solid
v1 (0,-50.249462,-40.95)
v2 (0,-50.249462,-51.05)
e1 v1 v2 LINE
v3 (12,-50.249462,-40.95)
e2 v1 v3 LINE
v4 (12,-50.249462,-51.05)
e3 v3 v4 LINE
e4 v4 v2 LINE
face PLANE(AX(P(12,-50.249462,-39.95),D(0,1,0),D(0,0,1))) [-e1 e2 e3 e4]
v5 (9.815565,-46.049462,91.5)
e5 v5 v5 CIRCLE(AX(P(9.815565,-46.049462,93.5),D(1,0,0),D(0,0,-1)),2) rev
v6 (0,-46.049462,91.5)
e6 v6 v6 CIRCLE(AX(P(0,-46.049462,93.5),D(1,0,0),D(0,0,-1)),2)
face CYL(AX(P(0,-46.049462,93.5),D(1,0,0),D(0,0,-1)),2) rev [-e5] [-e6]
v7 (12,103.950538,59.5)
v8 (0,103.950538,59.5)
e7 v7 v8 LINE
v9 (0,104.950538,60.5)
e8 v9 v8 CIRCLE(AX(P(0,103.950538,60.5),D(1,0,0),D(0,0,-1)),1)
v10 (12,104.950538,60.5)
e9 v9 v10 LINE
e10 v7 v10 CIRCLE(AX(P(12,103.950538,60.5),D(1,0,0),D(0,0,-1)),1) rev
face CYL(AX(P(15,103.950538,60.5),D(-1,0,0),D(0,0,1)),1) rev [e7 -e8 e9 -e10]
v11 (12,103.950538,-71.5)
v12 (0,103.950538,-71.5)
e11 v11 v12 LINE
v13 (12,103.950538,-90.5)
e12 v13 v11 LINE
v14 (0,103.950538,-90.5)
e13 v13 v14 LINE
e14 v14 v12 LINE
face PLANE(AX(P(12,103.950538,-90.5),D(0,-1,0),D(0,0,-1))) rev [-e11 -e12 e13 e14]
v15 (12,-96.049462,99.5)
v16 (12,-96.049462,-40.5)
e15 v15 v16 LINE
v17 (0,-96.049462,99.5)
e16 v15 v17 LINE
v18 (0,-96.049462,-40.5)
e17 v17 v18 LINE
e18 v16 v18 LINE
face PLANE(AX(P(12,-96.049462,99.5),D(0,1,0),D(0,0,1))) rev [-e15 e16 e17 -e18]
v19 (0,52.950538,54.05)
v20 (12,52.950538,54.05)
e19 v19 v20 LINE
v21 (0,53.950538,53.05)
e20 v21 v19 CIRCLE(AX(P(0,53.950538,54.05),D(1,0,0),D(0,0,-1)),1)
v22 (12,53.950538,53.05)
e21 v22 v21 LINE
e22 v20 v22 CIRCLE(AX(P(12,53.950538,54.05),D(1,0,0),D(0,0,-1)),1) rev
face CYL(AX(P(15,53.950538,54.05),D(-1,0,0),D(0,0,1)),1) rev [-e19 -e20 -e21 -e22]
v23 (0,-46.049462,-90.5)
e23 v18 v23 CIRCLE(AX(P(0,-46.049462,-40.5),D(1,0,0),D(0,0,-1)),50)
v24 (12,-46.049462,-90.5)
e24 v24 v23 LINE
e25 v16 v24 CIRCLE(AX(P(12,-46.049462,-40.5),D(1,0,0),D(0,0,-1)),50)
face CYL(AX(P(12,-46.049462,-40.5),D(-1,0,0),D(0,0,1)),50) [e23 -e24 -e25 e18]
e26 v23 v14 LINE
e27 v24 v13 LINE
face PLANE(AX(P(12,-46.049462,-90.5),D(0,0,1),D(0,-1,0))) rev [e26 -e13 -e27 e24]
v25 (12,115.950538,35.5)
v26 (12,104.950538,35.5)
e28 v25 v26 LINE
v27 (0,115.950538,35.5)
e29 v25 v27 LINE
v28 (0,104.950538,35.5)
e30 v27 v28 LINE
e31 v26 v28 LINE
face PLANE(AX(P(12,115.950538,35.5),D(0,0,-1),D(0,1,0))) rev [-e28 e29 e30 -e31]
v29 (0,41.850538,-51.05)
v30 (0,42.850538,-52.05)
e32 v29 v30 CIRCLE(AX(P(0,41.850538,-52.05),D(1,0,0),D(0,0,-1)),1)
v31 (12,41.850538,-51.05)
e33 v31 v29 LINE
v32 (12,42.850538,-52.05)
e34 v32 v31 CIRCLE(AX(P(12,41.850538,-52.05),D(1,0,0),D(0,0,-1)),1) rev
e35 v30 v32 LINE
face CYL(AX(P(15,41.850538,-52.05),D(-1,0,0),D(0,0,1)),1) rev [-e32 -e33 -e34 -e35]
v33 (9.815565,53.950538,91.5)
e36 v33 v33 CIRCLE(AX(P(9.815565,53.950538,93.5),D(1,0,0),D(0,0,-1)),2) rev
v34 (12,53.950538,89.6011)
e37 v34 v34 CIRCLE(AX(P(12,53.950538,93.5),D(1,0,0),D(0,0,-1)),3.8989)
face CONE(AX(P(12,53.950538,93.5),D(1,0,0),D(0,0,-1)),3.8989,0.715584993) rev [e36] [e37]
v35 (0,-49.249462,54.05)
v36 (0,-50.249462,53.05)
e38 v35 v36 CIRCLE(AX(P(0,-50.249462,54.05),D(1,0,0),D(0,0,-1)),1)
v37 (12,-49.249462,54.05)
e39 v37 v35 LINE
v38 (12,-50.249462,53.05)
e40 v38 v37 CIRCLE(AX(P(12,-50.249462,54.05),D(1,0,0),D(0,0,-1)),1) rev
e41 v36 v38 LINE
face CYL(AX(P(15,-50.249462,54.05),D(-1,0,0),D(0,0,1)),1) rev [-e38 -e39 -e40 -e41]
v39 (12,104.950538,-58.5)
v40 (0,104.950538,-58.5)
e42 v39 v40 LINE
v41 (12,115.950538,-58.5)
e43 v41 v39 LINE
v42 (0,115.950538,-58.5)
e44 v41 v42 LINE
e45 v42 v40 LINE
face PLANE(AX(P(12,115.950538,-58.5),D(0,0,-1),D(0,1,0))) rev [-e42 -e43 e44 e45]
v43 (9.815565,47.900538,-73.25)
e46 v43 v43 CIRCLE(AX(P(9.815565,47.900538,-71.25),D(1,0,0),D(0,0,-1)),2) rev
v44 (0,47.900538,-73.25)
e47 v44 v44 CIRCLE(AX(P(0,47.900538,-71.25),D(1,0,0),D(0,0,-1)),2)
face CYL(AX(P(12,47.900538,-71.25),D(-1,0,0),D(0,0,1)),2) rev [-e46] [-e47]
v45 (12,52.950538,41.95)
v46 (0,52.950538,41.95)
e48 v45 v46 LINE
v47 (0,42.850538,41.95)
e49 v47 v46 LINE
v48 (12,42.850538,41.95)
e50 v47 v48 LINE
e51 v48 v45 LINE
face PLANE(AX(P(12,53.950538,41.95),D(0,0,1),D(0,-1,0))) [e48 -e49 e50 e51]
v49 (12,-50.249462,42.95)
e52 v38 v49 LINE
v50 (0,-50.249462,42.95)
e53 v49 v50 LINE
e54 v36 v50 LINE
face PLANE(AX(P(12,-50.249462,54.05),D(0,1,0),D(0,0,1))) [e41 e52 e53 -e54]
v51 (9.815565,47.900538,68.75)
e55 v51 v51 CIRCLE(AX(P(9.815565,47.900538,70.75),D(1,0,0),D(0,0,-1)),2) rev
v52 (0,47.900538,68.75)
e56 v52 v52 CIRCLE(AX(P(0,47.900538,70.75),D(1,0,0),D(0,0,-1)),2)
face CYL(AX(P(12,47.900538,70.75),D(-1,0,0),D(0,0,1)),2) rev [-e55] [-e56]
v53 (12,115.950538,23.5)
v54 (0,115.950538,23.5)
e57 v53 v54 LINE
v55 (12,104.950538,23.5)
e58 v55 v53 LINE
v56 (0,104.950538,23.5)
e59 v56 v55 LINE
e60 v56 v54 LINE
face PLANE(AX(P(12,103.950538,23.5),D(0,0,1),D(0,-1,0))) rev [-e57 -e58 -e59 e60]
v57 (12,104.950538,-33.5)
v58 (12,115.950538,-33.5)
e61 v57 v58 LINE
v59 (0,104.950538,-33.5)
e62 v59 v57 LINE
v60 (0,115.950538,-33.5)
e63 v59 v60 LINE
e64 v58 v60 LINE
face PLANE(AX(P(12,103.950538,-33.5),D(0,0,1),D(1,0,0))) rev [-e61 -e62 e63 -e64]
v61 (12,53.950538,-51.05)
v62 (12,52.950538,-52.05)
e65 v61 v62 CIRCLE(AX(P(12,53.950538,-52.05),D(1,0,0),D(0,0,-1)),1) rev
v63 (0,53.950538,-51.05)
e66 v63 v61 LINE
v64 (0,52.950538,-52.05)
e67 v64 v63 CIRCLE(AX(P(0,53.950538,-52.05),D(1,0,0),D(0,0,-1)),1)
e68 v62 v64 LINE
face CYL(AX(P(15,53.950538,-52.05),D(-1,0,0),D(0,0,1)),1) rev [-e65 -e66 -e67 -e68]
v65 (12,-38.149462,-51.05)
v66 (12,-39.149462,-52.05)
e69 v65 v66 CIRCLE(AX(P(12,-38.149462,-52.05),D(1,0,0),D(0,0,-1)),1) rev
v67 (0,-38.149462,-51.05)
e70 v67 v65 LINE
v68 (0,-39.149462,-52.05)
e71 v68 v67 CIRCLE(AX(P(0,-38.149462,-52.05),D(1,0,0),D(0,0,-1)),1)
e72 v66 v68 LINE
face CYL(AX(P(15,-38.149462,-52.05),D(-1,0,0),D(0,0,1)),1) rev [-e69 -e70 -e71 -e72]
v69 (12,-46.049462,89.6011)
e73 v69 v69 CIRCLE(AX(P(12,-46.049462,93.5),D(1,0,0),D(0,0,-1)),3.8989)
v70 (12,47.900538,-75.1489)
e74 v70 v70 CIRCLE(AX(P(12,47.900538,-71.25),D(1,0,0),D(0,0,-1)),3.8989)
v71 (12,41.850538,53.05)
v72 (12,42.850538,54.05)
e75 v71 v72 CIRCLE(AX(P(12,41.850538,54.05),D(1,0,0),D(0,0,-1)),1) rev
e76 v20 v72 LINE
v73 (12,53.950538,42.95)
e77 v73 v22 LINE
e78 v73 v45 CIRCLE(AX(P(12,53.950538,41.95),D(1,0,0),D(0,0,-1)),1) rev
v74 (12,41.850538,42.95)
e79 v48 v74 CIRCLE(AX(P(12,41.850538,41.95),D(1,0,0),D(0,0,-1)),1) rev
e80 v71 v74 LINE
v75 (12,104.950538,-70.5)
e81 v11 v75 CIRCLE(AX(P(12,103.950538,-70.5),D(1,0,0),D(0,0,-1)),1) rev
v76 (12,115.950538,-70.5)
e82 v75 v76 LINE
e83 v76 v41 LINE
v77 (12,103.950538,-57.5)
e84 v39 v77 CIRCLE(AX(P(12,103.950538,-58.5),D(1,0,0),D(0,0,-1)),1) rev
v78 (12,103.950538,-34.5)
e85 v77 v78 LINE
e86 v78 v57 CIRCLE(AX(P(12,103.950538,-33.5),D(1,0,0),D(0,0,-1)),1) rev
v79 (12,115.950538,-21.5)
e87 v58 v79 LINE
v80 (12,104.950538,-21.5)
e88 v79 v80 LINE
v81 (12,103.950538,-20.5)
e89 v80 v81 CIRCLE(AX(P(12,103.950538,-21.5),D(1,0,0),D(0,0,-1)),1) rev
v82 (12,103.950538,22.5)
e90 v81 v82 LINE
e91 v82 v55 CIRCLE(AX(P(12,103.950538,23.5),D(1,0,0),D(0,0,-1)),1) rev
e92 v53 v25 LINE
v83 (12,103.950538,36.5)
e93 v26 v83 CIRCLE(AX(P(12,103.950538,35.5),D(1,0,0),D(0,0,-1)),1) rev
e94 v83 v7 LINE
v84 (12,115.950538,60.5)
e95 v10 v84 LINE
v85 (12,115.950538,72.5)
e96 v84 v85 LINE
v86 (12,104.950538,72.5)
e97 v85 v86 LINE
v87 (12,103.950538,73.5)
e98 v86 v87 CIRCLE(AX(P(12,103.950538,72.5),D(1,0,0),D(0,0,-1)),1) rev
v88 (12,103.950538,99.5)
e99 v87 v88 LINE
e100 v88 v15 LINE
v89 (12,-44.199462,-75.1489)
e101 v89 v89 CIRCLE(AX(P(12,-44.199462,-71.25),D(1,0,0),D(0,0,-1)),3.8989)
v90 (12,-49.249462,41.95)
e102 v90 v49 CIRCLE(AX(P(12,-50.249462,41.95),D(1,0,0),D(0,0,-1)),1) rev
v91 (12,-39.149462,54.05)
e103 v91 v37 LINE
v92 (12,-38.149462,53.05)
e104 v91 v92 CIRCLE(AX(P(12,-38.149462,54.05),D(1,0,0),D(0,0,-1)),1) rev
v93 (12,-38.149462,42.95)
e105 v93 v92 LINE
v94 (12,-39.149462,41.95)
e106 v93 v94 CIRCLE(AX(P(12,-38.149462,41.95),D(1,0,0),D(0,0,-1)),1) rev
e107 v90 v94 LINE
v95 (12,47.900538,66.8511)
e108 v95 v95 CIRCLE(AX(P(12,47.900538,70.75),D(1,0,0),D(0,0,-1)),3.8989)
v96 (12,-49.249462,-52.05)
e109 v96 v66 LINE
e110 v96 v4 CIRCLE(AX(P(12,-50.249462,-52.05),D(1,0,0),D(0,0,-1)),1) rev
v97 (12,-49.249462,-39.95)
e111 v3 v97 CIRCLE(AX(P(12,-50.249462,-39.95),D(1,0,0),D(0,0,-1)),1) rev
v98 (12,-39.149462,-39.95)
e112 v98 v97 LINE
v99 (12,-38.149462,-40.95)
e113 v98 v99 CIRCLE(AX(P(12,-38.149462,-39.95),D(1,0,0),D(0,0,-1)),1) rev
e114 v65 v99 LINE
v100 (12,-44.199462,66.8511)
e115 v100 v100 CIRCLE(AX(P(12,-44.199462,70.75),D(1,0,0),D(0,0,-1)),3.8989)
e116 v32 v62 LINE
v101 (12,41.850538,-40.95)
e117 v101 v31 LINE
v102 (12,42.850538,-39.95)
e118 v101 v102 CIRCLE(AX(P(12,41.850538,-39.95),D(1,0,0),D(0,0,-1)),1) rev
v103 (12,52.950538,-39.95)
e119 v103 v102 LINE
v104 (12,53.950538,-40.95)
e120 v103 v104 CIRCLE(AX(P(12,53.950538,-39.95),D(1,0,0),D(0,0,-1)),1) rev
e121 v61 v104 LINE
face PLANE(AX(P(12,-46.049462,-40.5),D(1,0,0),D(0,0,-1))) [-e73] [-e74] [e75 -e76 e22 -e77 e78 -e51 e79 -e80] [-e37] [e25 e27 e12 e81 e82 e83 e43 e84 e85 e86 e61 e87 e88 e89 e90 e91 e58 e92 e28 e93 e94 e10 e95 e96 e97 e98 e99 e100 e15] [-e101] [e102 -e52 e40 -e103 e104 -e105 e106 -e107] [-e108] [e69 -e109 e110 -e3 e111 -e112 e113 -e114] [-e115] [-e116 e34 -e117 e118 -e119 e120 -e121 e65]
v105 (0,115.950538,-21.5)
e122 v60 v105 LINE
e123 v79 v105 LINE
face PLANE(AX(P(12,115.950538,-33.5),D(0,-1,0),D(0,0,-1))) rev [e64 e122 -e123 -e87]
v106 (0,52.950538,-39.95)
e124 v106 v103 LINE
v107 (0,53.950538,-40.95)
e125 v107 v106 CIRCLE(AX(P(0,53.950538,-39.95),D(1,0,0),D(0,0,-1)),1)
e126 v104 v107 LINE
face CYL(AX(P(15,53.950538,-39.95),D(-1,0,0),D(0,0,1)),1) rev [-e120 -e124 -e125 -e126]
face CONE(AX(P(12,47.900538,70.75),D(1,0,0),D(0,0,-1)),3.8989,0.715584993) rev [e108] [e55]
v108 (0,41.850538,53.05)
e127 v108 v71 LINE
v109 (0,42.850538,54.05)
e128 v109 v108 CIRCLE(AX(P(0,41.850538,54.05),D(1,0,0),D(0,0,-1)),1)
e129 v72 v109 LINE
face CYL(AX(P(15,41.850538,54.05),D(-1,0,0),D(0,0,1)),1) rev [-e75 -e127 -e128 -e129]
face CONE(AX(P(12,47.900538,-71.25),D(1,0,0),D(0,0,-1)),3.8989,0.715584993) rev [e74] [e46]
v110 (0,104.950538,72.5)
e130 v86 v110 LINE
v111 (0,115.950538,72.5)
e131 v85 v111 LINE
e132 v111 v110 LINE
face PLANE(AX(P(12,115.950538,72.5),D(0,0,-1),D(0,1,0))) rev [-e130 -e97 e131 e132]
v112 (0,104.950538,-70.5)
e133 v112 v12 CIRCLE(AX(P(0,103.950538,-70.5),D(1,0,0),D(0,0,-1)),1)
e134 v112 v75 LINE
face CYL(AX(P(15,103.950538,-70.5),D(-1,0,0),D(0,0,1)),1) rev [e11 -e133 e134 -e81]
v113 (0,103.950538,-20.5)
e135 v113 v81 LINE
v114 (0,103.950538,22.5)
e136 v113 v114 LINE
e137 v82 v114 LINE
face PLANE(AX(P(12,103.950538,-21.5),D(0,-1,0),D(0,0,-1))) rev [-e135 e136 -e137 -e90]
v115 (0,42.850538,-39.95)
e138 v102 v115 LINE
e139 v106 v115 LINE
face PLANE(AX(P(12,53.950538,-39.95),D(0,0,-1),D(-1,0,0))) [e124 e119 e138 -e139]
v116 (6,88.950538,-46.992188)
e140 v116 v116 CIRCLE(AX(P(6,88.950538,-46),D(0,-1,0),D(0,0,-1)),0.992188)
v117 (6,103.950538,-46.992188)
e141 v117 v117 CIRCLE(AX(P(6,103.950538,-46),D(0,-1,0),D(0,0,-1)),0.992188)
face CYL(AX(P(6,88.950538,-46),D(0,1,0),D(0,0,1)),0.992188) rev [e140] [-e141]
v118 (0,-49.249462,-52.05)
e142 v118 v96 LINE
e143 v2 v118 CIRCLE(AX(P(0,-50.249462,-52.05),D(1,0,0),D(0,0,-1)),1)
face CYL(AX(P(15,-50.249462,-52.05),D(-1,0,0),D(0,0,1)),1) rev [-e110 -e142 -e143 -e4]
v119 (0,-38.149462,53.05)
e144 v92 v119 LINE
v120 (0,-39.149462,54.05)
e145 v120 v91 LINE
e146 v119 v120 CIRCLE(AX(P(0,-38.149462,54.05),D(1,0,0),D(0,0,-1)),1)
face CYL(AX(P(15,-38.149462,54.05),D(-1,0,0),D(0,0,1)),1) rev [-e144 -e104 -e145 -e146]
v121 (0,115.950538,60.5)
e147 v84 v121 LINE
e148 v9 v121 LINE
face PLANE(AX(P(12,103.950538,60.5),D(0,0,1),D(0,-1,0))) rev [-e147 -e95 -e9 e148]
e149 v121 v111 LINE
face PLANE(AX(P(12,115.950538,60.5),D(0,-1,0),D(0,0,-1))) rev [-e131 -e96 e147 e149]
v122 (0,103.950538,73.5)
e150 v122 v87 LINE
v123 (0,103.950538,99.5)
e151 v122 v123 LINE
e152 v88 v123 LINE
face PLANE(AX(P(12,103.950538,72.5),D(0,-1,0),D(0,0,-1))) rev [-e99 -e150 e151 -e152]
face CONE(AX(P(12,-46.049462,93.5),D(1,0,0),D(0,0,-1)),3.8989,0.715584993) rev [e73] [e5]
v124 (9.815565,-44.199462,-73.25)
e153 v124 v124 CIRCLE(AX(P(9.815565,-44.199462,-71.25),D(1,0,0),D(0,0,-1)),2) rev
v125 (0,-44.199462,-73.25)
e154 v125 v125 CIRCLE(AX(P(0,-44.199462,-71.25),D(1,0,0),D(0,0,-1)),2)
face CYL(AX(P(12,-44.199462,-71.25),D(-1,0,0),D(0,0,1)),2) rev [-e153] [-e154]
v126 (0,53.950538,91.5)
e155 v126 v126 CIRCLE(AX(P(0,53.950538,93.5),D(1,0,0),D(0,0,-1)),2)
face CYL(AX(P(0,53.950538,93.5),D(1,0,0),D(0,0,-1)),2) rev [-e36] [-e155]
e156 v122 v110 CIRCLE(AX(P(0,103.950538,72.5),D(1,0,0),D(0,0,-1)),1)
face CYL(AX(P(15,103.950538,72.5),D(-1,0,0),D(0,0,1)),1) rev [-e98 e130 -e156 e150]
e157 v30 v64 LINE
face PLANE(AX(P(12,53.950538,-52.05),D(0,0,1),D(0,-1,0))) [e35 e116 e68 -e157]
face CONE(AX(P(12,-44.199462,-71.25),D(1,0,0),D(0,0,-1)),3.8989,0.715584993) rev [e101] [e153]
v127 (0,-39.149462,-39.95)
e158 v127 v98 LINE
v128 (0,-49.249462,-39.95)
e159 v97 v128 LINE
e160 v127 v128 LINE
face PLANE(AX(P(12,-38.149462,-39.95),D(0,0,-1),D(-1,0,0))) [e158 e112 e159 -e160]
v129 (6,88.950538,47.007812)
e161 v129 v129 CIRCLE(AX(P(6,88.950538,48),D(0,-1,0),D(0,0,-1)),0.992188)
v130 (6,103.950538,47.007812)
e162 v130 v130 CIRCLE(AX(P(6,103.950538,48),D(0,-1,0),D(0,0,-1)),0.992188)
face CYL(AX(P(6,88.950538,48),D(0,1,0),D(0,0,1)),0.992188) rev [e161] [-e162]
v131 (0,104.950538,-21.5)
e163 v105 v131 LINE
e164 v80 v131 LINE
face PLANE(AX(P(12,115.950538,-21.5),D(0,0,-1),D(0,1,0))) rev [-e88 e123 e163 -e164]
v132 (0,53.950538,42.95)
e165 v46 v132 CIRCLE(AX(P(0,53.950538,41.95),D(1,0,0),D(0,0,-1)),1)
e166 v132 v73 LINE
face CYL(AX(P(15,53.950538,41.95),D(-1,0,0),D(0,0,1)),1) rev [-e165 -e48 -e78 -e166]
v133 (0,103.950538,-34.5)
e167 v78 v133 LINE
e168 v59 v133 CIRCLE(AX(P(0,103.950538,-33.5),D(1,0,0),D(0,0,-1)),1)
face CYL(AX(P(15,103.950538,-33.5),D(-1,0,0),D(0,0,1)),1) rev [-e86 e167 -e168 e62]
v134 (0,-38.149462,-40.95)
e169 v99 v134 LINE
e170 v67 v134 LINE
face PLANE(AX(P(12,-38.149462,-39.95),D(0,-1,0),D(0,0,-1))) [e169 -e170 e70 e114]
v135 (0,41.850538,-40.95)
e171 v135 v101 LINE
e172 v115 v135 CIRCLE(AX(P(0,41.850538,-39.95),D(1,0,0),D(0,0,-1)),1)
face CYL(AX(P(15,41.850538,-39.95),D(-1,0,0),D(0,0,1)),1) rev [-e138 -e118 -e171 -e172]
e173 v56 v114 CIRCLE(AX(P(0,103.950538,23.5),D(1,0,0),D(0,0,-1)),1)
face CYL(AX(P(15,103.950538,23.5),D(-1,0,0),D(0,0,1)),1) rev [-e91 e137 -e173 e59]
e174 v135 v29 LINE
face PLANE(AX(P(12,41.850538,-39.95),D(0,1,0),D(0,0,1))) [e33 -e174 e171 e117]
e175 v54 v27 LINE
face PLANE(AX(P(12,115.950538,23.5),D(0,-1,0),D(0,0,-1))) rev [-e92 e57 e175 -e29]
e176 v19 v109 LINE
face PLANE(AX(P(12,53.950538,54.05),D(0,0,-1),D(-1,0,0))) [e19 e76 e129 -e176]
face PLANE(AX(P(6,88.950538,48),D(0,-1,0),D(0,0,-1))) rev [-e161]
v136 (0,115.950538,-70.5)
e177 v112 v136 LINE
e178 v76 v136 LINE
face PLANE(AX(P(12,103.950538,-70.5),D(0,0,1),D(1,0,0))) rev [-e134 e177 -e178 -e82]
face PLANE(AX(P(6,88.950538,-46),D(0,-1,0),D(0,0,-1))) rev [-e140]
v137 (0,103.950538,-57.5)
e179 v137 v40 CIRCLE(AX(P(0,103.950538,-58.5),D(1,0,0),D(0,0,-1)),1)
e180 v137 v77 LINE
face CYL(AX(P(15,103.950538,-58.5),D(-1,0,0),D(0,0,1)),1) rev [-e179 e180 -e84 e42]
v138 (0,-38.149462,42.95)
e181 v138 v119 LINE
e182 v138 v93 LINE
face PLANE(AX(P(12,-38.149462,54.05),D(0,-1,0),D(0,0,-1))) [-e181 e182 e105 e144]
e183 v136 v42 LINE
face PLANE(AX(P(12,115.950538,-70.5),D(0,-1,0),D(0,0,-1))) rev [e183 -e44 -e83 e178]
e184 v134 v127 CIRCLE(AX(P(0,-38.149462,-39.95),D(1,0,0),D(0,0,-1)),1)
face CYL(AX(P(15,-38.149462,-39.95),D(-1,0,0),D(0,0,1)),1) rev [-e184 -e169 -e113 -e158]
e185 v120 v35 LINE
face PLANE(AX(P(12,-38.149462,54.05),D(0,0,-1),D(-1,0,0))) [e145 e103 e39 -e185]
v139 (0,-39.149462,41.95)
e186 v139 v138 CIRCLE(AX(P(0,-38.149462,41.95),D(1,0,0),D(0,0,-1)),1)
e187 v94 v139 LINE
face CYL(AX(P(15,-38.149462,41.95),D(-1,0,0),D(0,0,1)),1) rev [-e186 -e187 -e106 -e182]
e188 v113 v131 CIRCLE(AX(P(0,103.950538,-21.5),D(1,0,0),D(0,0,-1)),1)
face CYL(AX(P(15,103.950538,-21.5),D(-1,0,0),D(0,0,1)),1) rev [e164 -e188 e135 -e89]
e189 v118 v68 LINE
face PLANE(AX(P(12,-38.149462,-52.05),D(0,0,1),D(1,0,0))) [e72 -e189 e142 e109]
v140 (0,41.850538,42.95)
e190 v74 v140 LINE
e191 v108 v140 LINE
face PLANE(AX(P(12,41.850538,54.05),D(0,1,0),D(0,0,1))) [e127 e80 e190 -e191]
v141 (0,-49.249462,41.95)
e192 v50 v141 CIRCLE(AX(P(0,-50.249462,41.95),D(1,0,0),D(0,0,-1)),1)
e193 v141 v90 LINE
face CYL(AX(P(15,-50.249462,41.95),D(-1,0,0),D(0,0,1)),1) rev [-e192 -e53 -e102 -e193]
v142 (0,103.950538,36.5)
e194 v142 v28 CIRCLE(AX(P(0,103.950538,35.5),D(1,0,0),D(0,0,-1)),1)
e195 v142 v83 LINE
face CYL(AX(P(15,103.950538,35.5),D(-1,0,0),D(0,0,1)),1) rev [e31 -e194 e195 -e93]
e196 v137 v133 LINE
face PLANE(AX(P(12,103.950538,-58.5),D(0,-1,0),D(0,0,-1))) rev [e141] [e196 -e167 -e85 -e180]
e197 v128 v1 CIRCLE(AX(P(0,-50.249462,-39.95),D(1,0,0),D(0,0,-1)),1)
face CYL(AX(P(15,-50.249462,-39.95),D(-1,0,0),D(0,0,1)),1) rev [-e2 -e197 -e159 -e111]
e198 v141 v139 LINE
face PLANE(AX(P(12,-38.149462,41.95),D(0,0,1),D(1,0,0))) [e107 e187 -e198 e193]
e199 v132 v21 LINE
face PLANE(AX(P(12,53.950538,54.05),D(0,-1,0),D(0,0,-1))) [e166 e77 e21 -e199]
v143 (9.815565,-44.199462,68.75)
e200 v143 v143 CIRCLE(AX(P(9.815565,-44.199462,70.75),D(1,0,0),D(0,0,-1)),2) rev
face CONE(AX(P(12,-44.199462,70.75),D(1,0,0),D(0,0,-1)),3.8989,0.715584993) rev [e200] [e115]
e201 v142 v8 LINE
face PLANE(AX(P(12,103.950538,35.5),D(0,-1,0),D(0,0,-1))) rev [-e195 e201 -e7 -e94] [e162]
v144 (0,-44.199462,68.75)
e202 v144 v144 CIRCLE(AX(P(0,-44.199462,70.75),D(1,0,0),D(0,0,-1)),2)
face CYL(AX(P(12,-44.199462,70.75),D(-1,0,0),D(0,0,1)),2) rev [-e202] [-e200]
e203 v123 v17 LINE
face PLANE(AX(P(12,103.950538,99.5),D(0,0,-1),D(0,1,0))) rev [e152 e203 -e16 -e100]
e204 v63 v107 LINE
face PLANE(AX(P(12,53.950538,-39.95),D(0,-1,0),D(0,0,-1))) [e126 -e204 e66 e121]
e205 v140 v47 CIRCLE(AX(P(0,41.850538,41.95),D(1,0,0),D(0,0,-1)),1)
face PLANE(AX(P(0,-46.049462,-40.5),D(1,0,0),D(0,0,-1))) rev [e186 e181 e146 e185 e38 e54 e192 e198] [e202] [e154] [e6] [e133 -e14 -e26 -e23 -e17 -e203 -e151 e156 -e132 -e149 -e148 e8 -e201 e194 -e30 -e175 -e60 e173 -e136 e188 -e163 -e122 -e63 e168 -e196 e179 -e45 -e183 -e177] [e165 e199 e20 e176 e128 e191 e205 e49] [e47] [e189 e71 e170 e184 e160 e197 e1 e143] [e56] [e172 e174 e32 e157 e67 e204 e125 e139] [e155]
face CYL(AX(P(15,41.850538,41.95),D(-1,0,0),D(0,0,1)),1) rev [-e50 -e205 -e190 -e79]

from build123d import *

# Parameters (mm, degrees)
SKETCH1_R                 = 2
SKETCH1_W                 = 12.1
SKETCH1_H                 = 12.1
BOSS_EXTRUDE1_DEPTH       = 12
CUT_EXTRUDE2_START        = 103.950538
SKETCH4_R                 = 0.9921875
CUT_EXTRUDE2_DEPTH        = 15
SKETCH5_R                 = 1
CUT_EXTRUDE3_DEPTH        = 15
ADVANCEDHOLE2_OUTLINE_R   = 1.89865
ADVANCEDHOLE2_DEPTH       = 2.301024407
ADVANCEDHOLE2_DRAFT       = -41
ADVANCEDHOLE2_2_OUTLINE_R = 1.89865
ADVANCEDHOLE2_2_DEPTH     = 2.301024407
ADVANCEDHOLE2_2_DRAFT     = -41
SKETCH8_R                 = 2
CUT_EXTRUDE4_DEPTH        = 154.260488233


# Read off the part's stored shape, not the designer's step: AdvancedHole1, AdvancedHole2
with BuildPart() as part:
    # Sketch1 → Boss-Extrude1 (new body)
    with BuildSketch(Plane(origin=(0, 0, 0), x_dir=(0, 0, -1), z_dir=(1, 0, 0))):
        with BuildLine():
            Line((-72.5, 115.950537961), (-72.5, 103.950537961))
            Line((-72.5, 103.950537961), (-99.5, 103.950537961))
            Line((-99.5, 103.950537961), (-99.5, -96.049462039))
            Line((-99.5, -96.049462039), (40.5, -96.049462039))
            ThreePointArc((40.5, -96.049462039), (75.855339059, -81.404801099), (90.5, -46.049462039))
            Line((90.5, -46.049462039), (90.5, 103.950537961))
            Line((90.5, 103.950537961), (70.5, 103.950537961))
            Line((70.5, 103.950537961), (70.5, 115.950537961))
            Line((70.5, 115.950537961), (58.5, 115.950537961))
            Line((58.5, 115.950537961), (58.5, 103.950537961))
            Line((58.5, 103.950537961), (33.5, 103.950537961))
            Line((33.5, 103.950537961), (33.5, 115.950537961))
            Line((33.5, 115.950537961), (21.5, 115.950537961))
            Line((21.5, 115.950537961), (21.5, 103.950537961))
            Line((21.5, 103.950537961), (-23.5, 103.950537961))
            Line((-23.5, 103.950537961), (-23.5, 115.950537961))
            Line((-23.5, 115.950537961), (-35.5, 115.950537961))
            Line((-35.5, 115.950537961), (-35.5, 103.950537961))
            Line((-35.5, 103.950537961), (-60.5, 103.950537961))
            Line((-60.5, 103.950537961), (-60.5, 115.950537961))
            Line((-60.5, 115.950537961), (-72.5, 115.950537961))
        make_face()
        with Locations((71.25, 47.900537961)):
            Circle(SKETCH1_R, mode=Mode.SUBTRACT)
        with Locations((71.25, -44.199462039)):
            Circle(SKETCH1_R, mode=Mode.SUBTRACT)
        with Locations((-70.75, 47.900537961)):
            Circle(SKETCH1_R, mode=Mode.SUBTRACT)
        with Locations((-70.75, -44.199462039)):
            Circle(SKETCH1_R, mode=Mode.SUBTRACT)
        with Locations((46, 47.900537961)):
            Rectangle(SKETCH1_W, SKETCH1_H, mode=Mode.SUBTRACT)
        with Locations((46, -44.199462039)):
            Rectangle(SKETCH1_W, SKETCH1_H, mode=Mode.SUBTRACT)
        with Locations((-48, 47.900537961)):
            Rectangle(SKETCH1_W, SKETCH1_H, mode=Mode.SUBTRACT)
        with Locations((-48, -44.199462039)):
            Rectangle(SKETCH1_W, SKETCH1_H, mode=Mode.SUBTRACT)
    extrude(amount=BOSS_EXTRUDE1_DEPTH)

    # Sketch4 → Cut-Extrude2 (cut)
    with BuildSketch(Plane(origin=(0, 0, 0), x_dir=(1, 0, 0), z_dir=(0, 1, 0)).offset(CUT_EXTRUDE2_START)):
        with Locations(Location((6, 46, 0), (0, 0, 90))):
            Circle(SKETCH4_R)
        with Locations(Location((6, -48, 0), (0, 0, 90))):
            Circle(SKETCH4_R)
    extrude(amount=-CUT_EXTRUDE2_DEPTH, mode=Mode.SUBTRACT)

    # Sketch5 → Cut-Extrude3 (cut)
    with BuildSketch(Plane(origin=(0, 0, 0), x_dir=(0, 0, -1), z_dir=(1, 0, 0))):
        with Locations((-54.05, 53.950537961)):
            Circle(SKETCH5_R)
        with Locations((-41.95, 53.950537961)):
            Circle(SKETCH5_R)
        with Locations((-41.95, 41.850537961)):
            Circle(SKETCH5_R)
        with Locations((-54.05, 41.850537961)):
            Circle(SKETCH5_R)
        with Locations((39.95, 53.950537961)):
            Circle(SKETCH5_R)
        with Locations((52.05, 53.950537961)):
            Circle(SKETCH5_R)
        with Locations((52.05, 41.850537961)):
            Circle(SKETCH5_R)
        with Locations((39.95, 41.850537961)):
            Circle(SKETCH5_R)
        with Locations((-41.95, -38.149462039)):
            Circle(SKETCH5_R)
        with Locations((-54.05, -38.149462039)):
            Circle(SKETCH5_R)
        with Locations((-41.95, -50.249462039)):
            Circle(SKETCH5_R)
        with Locations((-54.05, -50.249462039)):
            Circle(SKETCH5_R)
        with Locations((39.95, -38.149462039)):
            Circle(SKETCH5_R)
        with Locations((52.05, -38.149462039)):
            Circle(SKETCH5_R)
        with Locations((52.05, -50.249462039)):
            Circle(SKETCH5_R)
        with Locations((39.95, -50.249462039)):
            Circle(SKETCH5_R)
        with Locations((21.5, 103.950537961)):
            Circle(SKETCH5_R)
        with Locations((33.5, 103.950537961)):
            Circle(SKETCH5_R)
        with Locations((58.5, 103.950537961)):
            Circle(SKETCH5_R)
        with Locations((70.5, 103.950537961)):
            Circle(SKETCH5_R)
        with Locations((-23.5, 103.950537961)):
            Circle(SKETCH5_R)
        with Locations((-35.5, 103.950537961)):
            Circle(SKETCH5_R)
        with Locations((-60.5, 103.950537961)):
            Circle(SKETCH5_R)
        with Locations((-72.5, 103.950537961)):
            Circle(SKETCH5_R)
    extrude(amount=CUT_EXTRUDE3_DEPTH, mode=Mode.SUBTRACT)

    # AdvancedHole1 outline → AdvancedHole1 (revolve, cut)
    with BuildSketch(Plane(origin=(0, -44.199462039, 70.75), x_dir=(0, 1, 0), z_dir=(0, 0, -1))):
        Polygon((2, 12), (2, 9.815565432), (3.8989, 12), align=None)
    revolve(axis=Axis((0, -44.199462039, 70.75), (1, 0, 0)), mode=Mode.SUBTRACT)

    # AdvancedHole1 2 outline → AdvancedHole1 2 (revolve, cut)
    with BuildSketch(Plane(origin=(0, 47.900537961, 70.75), x_dir=(0, 1, 0), z_dir=(0, 0, -1))):
        Polygon((2, 12), (2, 9.815565432), (3.8989, 12), align=None)
    revolve(axis=Axis((0, 47.900537961, 70.75), (1, 0, 0)), mode=Mode.SUBTRACT)

    # AdvancedHole1 3 outline → AdvancedHole1 3 (revolve, cut)
    with BuildSketch(Plane(origin=(0, -44.199462039, -71.25), x_dir=(0, 1, 0), z_dir=(0, 0, -1))):
        Polygon((2, 12), (2, 9.815565432), (3.8989, 12), align=None)
    revolve(axis=Axis((0, -44.199462039, -71.25), (1, 0, 0)), mode=Mode.SUBTRACT)

    # AdvancedHole1 4 outline → AdvancedHole1 4 (revolve, cut)
    with BuildSketch(Plane(origin=(0, 47.900537961, -71.25), x_dir=(0, 1, 0), z_dir=(0, 0, -1))):
        Polygon((2, 12), (2, 9.815565432), (3.8989, 12), align=None)
    revolve(axis=Axis((0, 47.900537961, -71.25), (1, 0, 0)), mode=Mode.SUBTRACT)


with BuildPart() as advancedhole2_tool:
    # AdvancedHole2 outline → AdvancedHole2 (with draft: the straight prism first)
    with BuildSketch(Plane.YZ.offset(9.698975593)):
        with Locations((-46.049462039, 93.5)):
            Circle(ADVANCEDHOLE2_OUTLINE_R)
    extrude(amount=ADVANCEDHOLE2_DEPTH)
    # AdvancedHole2: the draft: its side faces are tilted about the plane it starts from
    advancedhole2_sides = [advancedhole2_tool.faces().sort_by_distance(p)[0] for p in [
        (10.849487797, -47.948112039, 93.5),
    ]]
    draft(advancedhole2_sides, Plane.YZ.offset(9.698975593), ADVANCEDHOLE2_DRAFT)


with BuildPart() as part_1:
    add(part.part)

    # AdvancedHole2: cut by advancedhole2_tool
    add(advancedhole2_tool.part, mode=Mode.SUBTRACT)


with BuildPart() as advancedhole2_2_tool:
    # AdvancedHole2 2 outline → AdvancedHole2 2 (with draft: the straight prism first)
    with BuildSketch(Plane.YZ.offset(9.698975593)):
        with Locations((53.950537961, 93.5)):
            Circle(ADVANCEDHOLE2_2_OUTLINE_R)
    extrude(amount=ADVANCEDHOLE2_2_DEPTH)
    # AdvancedHole2 2: the draft: its side faces are tilted about the plane it starts from
    advancedhole2_2_sides = [advancedhole2_2_tool.faces().sort_by_distance(p)[0] for p in [
        (10.849487797, 52.051887961, 93.5),
    ]]
    draft(advancedhole2_2_sides, Plane.YZ.offset(9.698975593), ADVANCEDHOLE2_2_DRAFT)


with BuildPart() as part_2:
    add(part_1.part)

    # AdvancedHole2 2: cut by advancedhole2_2_tool
    add(advancedhole2_2_tool.part, mode=Mode.SUBTRACT)

    # Sketch8 → Cut-Extrude4 (cut, through all)
    with BuildSketch(Plane(origin=(12, 0, 0), x_dir=(0, 0, -1), z_dir=(1, 0, 0))):
        with Locations((-93.5, 53.950537961)):
            Circle(SKETCH8_R)
        with Locations((-93.5, -46.049462039)):
            Circle(SKETCH8_R)
    extrude(amount=-CUT_EXTRUDE4_DEPTH, mode=Mode.SUBTRACT)


solid = part_2.part
